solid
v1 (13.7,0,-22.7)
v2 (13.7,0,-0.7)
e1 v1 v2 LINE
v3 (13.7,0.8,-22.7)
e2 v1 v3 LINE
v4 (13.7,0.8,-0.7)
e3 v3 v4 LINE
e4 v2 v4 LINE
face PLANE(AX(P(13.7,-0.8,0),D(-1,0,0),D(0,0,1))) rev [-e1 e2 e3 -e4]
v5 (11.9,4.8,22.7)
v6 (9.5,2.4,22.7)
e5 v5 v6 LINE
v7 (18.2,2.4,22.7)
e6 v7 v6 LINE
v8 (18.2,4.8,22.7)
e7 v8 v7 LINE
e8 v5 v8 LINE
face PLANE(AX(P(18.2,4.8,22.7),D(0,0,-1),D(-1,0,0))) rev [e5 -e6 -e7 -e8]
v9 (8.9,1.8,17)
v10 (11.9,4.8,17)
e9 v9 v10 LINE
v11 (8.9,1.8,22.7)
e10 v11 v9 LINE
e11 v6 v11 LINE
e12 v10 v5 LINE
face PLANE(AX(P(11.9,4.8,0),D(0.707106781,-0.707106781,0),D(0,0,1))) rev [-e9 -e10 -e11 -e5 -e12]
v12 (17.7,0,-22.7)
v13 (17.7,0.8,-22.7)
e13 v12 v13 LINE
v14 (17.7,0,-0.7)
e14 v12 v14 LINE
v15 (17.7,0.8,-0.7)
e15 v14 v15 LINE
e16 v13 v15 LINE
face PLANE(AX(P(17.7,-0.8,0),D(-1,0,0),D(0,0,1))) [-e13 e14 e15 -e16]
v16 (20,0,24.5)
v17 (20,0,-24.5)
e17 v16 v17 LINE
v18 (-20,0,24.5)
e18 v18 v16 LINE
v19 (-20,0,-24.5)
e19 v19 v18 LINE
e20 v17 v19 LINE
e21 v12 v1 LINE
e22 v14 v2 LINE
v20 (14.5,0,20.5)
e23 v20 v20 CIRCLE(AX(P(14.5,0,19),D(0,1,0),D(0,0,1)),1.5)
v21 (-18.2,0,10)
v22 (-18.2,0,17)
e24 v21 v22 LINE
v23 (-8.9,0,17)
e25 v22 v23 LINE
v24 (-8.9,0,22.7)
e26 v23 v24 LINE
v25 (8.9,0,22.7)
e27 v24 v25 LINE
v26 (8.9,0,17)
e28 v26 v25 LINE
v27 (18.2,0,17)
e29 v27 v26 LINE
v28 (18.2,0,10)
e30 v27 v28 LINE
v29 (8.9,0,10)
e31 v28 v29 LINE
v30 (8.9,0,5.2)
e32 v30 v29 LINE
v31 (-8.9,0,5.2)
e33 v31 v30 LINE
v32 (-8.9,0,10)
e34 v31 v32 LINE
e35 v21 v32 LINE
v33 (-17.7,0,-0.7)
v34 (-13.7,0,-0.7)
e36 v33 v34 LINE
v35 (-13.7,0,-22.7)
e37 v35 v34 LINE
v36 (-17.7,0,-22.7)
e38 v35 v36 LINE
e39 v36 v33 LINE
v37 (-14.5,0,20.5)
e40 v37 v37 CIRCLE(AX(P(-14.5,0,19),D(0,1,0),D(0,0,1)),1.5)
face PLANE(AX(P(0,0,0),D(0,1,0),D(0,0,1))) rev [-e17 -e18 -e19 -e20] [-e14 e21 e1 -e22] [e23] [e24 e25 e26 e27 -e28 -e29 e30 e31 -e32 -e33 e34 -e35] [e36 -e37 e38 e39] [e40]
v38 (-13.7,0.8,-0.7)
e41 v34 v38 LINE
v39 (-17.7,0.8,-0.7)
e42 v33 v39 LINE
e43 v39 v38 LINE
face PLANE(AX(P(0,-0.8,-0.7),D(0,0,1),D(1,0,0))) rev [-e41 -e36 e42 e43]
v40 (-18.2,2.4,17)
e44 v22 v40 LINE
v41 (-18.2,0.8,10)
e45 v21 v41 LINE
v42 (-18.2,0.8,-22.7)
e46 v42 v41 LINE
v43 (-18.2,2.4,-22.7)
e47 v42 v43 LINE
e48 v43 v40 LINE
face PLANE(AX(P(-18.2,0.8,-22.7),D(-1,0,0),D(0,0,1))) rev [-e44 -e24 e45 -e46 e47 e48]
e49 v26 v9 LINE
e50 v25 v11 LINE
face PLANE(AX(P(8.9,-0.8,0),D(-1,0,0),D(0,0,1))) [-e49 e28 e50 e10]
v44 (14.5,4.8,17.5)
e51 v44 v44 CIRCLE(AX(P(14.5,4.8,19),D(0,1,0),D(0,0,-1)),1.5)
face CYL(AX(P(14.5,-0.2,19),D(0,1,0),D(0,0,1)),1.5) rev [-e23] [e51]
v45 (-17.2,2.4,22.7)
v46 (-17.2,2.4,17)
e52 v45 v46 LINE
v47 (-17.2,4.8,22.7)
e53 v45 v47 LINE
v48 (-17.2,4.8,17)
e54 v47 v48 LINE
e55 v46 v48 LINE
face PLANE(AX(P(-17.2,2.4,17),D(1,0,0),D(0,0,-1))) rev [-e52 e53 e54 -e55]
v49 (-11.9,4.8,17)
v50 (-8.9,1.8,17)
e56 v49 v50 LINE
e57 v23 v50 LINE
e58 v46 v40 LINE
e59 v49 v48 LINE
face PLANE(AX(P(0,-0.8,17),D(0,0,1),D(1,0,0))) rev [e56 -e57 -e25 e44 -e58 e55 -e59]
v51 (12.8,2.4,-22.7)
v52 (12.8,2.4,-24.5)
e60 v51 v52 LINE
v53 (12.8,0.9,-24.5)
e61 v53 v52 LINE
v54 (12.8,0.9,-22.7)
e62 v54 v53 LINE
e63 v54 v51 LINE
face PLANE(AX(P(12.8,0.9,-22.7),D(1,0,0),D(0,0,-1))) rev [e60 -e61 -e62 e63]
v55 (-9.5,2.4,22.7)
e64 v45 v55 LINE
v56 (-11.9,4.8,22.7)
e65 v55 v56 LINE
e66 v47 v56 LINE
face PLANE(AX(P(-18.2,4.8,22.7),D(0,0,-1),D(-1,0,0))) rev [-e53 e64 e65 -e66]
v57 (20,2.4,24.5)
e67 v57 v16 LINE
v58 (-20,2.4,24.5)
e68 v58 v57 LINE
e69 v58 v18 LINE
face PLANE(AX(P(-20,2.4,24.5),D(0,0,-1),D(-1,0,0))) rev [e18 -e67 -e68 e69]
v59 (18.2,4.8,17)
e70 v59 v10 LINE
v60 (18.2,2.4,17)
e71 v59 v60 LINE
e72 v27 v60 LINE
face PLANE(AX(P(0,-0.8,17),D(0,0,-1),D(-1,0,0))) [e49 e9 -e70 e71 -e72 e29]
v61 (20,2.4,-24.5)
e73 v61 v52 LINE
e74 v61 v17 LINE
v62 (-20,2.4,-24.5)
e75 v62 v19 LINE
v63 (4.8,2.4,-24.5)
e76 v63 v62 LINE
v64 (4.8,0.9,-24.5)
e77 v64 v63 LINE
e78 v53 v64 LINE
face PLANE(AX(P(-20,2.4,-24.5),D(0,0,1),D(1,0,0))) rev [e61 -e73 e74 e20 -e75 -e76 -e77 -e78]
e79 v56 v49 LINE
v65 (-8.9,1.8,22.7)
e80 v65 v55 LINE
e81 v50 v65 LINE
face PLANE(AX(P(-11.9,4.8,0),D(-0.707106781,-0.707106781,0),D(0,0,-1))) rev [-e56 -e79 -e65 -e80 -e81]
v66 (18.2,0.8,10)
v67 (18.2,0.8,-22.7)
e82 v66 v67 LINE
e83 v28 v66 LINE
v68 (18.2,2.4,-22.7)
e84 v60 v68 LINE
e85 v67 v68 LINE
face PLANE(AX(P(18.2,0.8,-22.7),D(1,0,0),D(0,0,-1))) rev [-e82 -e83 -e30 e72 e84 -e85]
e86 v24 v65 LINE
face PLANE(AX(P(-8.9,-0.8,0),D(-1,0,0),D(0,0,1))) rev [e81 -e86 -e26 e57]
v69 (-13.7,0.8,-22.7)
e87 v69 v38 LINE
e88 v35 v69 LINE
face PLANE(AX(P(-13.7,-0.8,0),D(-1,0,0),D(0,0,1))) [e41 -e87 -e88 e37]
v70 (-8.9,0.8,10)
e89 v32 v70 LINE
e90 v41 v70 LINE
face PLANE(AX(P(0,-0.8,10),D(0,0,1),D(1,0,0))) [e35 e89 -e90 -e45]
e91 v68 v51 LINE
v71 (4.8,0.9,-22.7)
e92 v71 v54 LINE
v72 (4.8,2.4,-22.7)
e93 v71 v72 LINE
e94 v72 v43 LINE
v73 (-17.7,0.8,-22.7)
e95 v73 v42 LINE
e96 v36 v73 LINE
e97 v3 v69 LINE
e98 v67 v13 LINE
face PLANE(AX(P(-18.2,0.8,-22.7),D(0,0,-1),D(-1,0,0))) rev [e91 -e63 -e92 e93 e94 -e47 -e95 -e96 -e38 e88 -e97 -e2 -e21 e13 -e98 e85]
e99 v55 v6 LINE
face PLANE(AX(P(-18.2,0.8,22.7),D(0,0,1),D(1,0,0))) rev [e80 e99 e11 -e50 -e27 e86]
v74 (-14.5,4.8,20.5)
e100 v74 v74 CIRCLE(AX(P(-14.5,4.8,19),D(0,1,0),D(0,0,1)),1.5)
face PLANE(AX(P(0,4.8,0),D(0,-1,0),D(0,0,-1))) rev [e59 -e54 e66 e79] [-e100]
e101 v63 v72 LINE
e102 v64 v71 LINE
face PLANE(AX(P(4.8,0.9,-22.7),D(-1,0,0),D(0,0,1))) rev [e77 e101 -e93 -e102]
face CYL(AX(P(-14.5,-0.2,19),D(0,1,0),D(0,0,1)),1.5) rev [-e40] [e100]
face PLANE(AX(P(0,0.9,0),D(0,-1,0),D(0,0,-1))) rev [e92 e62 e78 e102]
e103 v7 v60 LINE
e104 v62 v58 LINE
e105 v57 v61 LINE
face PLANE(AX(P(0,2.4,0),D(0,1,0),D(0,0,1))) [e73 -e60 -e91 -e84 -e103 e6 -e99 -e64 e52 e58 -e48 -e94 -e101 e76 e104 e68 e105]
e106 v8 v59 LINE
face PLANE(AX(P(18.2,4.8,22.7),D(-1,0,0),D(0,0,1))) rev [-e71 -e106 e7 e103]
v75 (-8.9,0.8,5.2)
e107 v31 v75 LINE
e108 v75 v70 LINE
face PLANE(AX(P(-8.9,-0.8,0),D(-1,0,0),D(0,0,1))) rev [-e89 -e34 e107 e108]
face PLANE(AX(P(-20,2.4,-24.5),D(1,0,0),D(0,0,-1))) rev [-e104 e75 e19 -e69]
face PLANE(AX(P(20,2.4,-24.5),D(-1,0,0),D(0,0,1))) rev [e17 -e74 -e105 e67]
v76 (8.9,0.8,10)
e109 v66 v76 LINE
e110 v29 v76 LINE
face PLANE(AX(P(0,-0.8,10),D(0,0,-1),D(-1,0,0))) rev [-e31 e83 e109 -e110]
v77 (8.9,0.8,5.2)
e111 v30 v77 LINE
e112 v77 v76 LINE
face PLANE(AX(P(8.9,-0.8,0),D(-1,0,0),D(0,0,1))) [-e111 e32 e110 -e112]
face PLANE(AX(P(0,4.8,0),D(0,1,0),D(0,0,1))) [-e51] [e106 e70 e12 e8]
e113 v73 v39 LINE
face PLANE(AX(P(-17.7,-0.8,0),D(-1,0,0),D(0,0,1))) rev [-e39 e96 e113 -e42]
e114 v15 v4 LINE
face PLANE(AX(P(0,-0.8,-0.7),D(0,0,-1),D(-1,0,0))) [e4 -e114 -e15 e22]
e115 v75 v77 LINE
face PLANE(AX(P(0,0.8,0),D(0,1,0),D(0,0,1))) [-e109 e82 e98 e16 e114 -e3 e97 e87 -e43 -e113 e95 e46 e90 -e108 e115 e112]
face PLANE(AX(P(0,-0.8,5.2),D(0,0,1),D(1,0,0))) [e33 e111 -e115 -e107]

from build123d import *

# Parameters (mm, degrees)
SKETCH1_W           = 40
SKETCH1_H           = 49
BOSS_EXTRUDE1_DEPTH = 2.4
SKETCH2_W           = 36.4
SKETCH2_H           = 45.4
CUT_EXTRUDE1_DEPTH  = 1.6
SKETCH3_W           = 9.3
SKETCH3_H           = 7
SKETCH3_W_2         = 4
SKETCH3_H_2         = 22
CUT_EXTRUDE2_DEPTH  = 1.6
SKETCH4_W           = 9.3
SKETCH4_H           = 5.7
BOSS_EXTRUDE2_DEPTH = 4
SKETCH5_R           = 1.5
CUT_EXTRUDE3_DEPTH  = 5
CHAMFER1_SIZE       = 3
SKETCH6_W           = 8
SKETCH6_H           = 1.8
CUT_EXTRUDE4_DEPTH  = 1.5
SKETCH7_W           = 1
SKETCH7_H           = 5.7
CUT_EXTRUDE5_DEPTH  = 2.4


with BuildPart() as part:
    # Sketch1 → Boss-Extrude1 (new body)
    with BuildSketch(Plane(origin=(0, 0, 0), x_dir=(1, 0, 0), z_dir=(0, 1, 0))):
        Rectangle(SKETCH1_W, SKETCH1_H)
    extrude(amount=BOSS_EXTRUDE1_DEPTH)

    # Sketch2 → Cut-Extrude1 (cut)
    with BuildSketch(Plane(origin=(0, 2.4, 0), x_dir=(1, 0, 0), z_dir=(0, 1, 0))):
        Rectangle(SKETCH2_W, SKETCH2_H)
    extrude(amount=-CUT_EXTRUDE1_DEPTH, mode=Mode.SUBTRACT)

    # Sketch3 → Cut-Extrude2 (cut)
    with BuildSketch(Plane(origin=(0, 0.8, 0), x_dir=(1, 0, 0), z_dir=(0, 1, 0))):
        with Locations((-13.55, -13.5)):
            Rectangle(SKETCH3_W, SKETCH3_H)
        Polygon((8.9, -5.2), (-8.9, -5.2), (-8.9, -10), (-8.9, -17), (-8.9, -22.7), (8.9, -22.7), (8.9, -17), (8.9, -10), align=None)
        with Locations((13.55, -13.5)):
            Rectangle(SKETCH3_W, SKETCH3_H)
        with Locations((15.7, 11.7)):
            Rectangle(SKETCH3_W_2, SKETCH3_H_2)
        with Locations((-15.7, 11.7)):
            Rectangle(SKETCH3_W_2, SKETCH3_H_2)
    extrude(amount=-CUT_EXTRUDE2_DEPTH, mode=Mode.SUBTRACT)

    # Sketch4 → Boss-Extrude2 (add)
    with BuildSketch(Plane(origin=(0, 0.8, 0), x_dir=(1, 0, 0), z_dir=(0, 1, 0))):
        with Locations((-13.55, -19.85)):
            Rectangle(SKETCH4_W, SKETCH4_H)
        with Locations((13.55, -19.85)):
            Rectangle(SKETCH4_W, SKETCH4_H)
    extrude(amount=BOSS_EXTRUDE2_DEPTH)

    # Sketch5 → Cut-Extrude3 (cut)
    with BuildSketch(Plane(origin=(0, 4.8, 0), x_dir=(1, 0, 0), z_dir=(0, 1, 0))):
        with Locations(Location((-14.5, -19, 0), (0, 0, 270))):
            Circle(SKETCH5_R)
        with Locations(Location((14.5, -19, 0), (0, 0, 270))):
            Circle(SKETCH5_R)
    extrude(amount=-CUT_EXTRUDE3_DEPTH, mode=Mode.SUBTRACT)

    # Chamfer1
    # the kernel refuses this chamfer: 3 mm, written as the material it takes off along each edge
    with BuildSketch(Plane(origin=(-8.9, 4.8, 22.7), x_dir=(0.02749587661058793, -0.9996219169112968, 0), z_dir=(0, 0, -1)), Plane(origin=(8.9, 4.8, 9.284951036), x_dir=(-0.027495876610586202, -0.9996219169112968, 0), z_dir=(0, 0, 1))) as chamfer1_piece_1:
        Polygon((CHAMFER1_SIZE * 0.999621916911, CHAMFER1_SIZE * 0.0274958766106), (-CHAMFER1_SIZE * 0.0274958766106, CHAMFER1_SIZE * 0.999621916911), (0, 0), align=None)
    extrude(amount=13.415048964, mode=Mode.SUBTRACT)

    # Sketch6 → Cut-Extrude4 (cut)
    with BuildSketch(Plane(origin=(0, 2.4, 0), x_dir=(1, 0, 0), z_dir=(0, 1, 0))):
        with Locations((8.8, 23.6)):
            Rectangle(SKETCH6_W, SKETCH6_H)
    extrude(amount=-CUT_EXTRUDE4_DEPTH, mode=Mode.SUBTRACT)

    # Sketch7 → Cut-Extrude5 (cut)
    with BuildSketch(Plane(origin=(0, 4.8, 0), x_dir=(1, 0, 0), z_dir=(0, 1, 0))):
        with Locations((-17.7, -19.85)):
            Rectangle(SKETCH7_W, SKETCH7_H)
    extrude(amount=-CUT_EXTRUDE5_DEPTH, mode=Mode.SUBTRACT)


solid = part.part
